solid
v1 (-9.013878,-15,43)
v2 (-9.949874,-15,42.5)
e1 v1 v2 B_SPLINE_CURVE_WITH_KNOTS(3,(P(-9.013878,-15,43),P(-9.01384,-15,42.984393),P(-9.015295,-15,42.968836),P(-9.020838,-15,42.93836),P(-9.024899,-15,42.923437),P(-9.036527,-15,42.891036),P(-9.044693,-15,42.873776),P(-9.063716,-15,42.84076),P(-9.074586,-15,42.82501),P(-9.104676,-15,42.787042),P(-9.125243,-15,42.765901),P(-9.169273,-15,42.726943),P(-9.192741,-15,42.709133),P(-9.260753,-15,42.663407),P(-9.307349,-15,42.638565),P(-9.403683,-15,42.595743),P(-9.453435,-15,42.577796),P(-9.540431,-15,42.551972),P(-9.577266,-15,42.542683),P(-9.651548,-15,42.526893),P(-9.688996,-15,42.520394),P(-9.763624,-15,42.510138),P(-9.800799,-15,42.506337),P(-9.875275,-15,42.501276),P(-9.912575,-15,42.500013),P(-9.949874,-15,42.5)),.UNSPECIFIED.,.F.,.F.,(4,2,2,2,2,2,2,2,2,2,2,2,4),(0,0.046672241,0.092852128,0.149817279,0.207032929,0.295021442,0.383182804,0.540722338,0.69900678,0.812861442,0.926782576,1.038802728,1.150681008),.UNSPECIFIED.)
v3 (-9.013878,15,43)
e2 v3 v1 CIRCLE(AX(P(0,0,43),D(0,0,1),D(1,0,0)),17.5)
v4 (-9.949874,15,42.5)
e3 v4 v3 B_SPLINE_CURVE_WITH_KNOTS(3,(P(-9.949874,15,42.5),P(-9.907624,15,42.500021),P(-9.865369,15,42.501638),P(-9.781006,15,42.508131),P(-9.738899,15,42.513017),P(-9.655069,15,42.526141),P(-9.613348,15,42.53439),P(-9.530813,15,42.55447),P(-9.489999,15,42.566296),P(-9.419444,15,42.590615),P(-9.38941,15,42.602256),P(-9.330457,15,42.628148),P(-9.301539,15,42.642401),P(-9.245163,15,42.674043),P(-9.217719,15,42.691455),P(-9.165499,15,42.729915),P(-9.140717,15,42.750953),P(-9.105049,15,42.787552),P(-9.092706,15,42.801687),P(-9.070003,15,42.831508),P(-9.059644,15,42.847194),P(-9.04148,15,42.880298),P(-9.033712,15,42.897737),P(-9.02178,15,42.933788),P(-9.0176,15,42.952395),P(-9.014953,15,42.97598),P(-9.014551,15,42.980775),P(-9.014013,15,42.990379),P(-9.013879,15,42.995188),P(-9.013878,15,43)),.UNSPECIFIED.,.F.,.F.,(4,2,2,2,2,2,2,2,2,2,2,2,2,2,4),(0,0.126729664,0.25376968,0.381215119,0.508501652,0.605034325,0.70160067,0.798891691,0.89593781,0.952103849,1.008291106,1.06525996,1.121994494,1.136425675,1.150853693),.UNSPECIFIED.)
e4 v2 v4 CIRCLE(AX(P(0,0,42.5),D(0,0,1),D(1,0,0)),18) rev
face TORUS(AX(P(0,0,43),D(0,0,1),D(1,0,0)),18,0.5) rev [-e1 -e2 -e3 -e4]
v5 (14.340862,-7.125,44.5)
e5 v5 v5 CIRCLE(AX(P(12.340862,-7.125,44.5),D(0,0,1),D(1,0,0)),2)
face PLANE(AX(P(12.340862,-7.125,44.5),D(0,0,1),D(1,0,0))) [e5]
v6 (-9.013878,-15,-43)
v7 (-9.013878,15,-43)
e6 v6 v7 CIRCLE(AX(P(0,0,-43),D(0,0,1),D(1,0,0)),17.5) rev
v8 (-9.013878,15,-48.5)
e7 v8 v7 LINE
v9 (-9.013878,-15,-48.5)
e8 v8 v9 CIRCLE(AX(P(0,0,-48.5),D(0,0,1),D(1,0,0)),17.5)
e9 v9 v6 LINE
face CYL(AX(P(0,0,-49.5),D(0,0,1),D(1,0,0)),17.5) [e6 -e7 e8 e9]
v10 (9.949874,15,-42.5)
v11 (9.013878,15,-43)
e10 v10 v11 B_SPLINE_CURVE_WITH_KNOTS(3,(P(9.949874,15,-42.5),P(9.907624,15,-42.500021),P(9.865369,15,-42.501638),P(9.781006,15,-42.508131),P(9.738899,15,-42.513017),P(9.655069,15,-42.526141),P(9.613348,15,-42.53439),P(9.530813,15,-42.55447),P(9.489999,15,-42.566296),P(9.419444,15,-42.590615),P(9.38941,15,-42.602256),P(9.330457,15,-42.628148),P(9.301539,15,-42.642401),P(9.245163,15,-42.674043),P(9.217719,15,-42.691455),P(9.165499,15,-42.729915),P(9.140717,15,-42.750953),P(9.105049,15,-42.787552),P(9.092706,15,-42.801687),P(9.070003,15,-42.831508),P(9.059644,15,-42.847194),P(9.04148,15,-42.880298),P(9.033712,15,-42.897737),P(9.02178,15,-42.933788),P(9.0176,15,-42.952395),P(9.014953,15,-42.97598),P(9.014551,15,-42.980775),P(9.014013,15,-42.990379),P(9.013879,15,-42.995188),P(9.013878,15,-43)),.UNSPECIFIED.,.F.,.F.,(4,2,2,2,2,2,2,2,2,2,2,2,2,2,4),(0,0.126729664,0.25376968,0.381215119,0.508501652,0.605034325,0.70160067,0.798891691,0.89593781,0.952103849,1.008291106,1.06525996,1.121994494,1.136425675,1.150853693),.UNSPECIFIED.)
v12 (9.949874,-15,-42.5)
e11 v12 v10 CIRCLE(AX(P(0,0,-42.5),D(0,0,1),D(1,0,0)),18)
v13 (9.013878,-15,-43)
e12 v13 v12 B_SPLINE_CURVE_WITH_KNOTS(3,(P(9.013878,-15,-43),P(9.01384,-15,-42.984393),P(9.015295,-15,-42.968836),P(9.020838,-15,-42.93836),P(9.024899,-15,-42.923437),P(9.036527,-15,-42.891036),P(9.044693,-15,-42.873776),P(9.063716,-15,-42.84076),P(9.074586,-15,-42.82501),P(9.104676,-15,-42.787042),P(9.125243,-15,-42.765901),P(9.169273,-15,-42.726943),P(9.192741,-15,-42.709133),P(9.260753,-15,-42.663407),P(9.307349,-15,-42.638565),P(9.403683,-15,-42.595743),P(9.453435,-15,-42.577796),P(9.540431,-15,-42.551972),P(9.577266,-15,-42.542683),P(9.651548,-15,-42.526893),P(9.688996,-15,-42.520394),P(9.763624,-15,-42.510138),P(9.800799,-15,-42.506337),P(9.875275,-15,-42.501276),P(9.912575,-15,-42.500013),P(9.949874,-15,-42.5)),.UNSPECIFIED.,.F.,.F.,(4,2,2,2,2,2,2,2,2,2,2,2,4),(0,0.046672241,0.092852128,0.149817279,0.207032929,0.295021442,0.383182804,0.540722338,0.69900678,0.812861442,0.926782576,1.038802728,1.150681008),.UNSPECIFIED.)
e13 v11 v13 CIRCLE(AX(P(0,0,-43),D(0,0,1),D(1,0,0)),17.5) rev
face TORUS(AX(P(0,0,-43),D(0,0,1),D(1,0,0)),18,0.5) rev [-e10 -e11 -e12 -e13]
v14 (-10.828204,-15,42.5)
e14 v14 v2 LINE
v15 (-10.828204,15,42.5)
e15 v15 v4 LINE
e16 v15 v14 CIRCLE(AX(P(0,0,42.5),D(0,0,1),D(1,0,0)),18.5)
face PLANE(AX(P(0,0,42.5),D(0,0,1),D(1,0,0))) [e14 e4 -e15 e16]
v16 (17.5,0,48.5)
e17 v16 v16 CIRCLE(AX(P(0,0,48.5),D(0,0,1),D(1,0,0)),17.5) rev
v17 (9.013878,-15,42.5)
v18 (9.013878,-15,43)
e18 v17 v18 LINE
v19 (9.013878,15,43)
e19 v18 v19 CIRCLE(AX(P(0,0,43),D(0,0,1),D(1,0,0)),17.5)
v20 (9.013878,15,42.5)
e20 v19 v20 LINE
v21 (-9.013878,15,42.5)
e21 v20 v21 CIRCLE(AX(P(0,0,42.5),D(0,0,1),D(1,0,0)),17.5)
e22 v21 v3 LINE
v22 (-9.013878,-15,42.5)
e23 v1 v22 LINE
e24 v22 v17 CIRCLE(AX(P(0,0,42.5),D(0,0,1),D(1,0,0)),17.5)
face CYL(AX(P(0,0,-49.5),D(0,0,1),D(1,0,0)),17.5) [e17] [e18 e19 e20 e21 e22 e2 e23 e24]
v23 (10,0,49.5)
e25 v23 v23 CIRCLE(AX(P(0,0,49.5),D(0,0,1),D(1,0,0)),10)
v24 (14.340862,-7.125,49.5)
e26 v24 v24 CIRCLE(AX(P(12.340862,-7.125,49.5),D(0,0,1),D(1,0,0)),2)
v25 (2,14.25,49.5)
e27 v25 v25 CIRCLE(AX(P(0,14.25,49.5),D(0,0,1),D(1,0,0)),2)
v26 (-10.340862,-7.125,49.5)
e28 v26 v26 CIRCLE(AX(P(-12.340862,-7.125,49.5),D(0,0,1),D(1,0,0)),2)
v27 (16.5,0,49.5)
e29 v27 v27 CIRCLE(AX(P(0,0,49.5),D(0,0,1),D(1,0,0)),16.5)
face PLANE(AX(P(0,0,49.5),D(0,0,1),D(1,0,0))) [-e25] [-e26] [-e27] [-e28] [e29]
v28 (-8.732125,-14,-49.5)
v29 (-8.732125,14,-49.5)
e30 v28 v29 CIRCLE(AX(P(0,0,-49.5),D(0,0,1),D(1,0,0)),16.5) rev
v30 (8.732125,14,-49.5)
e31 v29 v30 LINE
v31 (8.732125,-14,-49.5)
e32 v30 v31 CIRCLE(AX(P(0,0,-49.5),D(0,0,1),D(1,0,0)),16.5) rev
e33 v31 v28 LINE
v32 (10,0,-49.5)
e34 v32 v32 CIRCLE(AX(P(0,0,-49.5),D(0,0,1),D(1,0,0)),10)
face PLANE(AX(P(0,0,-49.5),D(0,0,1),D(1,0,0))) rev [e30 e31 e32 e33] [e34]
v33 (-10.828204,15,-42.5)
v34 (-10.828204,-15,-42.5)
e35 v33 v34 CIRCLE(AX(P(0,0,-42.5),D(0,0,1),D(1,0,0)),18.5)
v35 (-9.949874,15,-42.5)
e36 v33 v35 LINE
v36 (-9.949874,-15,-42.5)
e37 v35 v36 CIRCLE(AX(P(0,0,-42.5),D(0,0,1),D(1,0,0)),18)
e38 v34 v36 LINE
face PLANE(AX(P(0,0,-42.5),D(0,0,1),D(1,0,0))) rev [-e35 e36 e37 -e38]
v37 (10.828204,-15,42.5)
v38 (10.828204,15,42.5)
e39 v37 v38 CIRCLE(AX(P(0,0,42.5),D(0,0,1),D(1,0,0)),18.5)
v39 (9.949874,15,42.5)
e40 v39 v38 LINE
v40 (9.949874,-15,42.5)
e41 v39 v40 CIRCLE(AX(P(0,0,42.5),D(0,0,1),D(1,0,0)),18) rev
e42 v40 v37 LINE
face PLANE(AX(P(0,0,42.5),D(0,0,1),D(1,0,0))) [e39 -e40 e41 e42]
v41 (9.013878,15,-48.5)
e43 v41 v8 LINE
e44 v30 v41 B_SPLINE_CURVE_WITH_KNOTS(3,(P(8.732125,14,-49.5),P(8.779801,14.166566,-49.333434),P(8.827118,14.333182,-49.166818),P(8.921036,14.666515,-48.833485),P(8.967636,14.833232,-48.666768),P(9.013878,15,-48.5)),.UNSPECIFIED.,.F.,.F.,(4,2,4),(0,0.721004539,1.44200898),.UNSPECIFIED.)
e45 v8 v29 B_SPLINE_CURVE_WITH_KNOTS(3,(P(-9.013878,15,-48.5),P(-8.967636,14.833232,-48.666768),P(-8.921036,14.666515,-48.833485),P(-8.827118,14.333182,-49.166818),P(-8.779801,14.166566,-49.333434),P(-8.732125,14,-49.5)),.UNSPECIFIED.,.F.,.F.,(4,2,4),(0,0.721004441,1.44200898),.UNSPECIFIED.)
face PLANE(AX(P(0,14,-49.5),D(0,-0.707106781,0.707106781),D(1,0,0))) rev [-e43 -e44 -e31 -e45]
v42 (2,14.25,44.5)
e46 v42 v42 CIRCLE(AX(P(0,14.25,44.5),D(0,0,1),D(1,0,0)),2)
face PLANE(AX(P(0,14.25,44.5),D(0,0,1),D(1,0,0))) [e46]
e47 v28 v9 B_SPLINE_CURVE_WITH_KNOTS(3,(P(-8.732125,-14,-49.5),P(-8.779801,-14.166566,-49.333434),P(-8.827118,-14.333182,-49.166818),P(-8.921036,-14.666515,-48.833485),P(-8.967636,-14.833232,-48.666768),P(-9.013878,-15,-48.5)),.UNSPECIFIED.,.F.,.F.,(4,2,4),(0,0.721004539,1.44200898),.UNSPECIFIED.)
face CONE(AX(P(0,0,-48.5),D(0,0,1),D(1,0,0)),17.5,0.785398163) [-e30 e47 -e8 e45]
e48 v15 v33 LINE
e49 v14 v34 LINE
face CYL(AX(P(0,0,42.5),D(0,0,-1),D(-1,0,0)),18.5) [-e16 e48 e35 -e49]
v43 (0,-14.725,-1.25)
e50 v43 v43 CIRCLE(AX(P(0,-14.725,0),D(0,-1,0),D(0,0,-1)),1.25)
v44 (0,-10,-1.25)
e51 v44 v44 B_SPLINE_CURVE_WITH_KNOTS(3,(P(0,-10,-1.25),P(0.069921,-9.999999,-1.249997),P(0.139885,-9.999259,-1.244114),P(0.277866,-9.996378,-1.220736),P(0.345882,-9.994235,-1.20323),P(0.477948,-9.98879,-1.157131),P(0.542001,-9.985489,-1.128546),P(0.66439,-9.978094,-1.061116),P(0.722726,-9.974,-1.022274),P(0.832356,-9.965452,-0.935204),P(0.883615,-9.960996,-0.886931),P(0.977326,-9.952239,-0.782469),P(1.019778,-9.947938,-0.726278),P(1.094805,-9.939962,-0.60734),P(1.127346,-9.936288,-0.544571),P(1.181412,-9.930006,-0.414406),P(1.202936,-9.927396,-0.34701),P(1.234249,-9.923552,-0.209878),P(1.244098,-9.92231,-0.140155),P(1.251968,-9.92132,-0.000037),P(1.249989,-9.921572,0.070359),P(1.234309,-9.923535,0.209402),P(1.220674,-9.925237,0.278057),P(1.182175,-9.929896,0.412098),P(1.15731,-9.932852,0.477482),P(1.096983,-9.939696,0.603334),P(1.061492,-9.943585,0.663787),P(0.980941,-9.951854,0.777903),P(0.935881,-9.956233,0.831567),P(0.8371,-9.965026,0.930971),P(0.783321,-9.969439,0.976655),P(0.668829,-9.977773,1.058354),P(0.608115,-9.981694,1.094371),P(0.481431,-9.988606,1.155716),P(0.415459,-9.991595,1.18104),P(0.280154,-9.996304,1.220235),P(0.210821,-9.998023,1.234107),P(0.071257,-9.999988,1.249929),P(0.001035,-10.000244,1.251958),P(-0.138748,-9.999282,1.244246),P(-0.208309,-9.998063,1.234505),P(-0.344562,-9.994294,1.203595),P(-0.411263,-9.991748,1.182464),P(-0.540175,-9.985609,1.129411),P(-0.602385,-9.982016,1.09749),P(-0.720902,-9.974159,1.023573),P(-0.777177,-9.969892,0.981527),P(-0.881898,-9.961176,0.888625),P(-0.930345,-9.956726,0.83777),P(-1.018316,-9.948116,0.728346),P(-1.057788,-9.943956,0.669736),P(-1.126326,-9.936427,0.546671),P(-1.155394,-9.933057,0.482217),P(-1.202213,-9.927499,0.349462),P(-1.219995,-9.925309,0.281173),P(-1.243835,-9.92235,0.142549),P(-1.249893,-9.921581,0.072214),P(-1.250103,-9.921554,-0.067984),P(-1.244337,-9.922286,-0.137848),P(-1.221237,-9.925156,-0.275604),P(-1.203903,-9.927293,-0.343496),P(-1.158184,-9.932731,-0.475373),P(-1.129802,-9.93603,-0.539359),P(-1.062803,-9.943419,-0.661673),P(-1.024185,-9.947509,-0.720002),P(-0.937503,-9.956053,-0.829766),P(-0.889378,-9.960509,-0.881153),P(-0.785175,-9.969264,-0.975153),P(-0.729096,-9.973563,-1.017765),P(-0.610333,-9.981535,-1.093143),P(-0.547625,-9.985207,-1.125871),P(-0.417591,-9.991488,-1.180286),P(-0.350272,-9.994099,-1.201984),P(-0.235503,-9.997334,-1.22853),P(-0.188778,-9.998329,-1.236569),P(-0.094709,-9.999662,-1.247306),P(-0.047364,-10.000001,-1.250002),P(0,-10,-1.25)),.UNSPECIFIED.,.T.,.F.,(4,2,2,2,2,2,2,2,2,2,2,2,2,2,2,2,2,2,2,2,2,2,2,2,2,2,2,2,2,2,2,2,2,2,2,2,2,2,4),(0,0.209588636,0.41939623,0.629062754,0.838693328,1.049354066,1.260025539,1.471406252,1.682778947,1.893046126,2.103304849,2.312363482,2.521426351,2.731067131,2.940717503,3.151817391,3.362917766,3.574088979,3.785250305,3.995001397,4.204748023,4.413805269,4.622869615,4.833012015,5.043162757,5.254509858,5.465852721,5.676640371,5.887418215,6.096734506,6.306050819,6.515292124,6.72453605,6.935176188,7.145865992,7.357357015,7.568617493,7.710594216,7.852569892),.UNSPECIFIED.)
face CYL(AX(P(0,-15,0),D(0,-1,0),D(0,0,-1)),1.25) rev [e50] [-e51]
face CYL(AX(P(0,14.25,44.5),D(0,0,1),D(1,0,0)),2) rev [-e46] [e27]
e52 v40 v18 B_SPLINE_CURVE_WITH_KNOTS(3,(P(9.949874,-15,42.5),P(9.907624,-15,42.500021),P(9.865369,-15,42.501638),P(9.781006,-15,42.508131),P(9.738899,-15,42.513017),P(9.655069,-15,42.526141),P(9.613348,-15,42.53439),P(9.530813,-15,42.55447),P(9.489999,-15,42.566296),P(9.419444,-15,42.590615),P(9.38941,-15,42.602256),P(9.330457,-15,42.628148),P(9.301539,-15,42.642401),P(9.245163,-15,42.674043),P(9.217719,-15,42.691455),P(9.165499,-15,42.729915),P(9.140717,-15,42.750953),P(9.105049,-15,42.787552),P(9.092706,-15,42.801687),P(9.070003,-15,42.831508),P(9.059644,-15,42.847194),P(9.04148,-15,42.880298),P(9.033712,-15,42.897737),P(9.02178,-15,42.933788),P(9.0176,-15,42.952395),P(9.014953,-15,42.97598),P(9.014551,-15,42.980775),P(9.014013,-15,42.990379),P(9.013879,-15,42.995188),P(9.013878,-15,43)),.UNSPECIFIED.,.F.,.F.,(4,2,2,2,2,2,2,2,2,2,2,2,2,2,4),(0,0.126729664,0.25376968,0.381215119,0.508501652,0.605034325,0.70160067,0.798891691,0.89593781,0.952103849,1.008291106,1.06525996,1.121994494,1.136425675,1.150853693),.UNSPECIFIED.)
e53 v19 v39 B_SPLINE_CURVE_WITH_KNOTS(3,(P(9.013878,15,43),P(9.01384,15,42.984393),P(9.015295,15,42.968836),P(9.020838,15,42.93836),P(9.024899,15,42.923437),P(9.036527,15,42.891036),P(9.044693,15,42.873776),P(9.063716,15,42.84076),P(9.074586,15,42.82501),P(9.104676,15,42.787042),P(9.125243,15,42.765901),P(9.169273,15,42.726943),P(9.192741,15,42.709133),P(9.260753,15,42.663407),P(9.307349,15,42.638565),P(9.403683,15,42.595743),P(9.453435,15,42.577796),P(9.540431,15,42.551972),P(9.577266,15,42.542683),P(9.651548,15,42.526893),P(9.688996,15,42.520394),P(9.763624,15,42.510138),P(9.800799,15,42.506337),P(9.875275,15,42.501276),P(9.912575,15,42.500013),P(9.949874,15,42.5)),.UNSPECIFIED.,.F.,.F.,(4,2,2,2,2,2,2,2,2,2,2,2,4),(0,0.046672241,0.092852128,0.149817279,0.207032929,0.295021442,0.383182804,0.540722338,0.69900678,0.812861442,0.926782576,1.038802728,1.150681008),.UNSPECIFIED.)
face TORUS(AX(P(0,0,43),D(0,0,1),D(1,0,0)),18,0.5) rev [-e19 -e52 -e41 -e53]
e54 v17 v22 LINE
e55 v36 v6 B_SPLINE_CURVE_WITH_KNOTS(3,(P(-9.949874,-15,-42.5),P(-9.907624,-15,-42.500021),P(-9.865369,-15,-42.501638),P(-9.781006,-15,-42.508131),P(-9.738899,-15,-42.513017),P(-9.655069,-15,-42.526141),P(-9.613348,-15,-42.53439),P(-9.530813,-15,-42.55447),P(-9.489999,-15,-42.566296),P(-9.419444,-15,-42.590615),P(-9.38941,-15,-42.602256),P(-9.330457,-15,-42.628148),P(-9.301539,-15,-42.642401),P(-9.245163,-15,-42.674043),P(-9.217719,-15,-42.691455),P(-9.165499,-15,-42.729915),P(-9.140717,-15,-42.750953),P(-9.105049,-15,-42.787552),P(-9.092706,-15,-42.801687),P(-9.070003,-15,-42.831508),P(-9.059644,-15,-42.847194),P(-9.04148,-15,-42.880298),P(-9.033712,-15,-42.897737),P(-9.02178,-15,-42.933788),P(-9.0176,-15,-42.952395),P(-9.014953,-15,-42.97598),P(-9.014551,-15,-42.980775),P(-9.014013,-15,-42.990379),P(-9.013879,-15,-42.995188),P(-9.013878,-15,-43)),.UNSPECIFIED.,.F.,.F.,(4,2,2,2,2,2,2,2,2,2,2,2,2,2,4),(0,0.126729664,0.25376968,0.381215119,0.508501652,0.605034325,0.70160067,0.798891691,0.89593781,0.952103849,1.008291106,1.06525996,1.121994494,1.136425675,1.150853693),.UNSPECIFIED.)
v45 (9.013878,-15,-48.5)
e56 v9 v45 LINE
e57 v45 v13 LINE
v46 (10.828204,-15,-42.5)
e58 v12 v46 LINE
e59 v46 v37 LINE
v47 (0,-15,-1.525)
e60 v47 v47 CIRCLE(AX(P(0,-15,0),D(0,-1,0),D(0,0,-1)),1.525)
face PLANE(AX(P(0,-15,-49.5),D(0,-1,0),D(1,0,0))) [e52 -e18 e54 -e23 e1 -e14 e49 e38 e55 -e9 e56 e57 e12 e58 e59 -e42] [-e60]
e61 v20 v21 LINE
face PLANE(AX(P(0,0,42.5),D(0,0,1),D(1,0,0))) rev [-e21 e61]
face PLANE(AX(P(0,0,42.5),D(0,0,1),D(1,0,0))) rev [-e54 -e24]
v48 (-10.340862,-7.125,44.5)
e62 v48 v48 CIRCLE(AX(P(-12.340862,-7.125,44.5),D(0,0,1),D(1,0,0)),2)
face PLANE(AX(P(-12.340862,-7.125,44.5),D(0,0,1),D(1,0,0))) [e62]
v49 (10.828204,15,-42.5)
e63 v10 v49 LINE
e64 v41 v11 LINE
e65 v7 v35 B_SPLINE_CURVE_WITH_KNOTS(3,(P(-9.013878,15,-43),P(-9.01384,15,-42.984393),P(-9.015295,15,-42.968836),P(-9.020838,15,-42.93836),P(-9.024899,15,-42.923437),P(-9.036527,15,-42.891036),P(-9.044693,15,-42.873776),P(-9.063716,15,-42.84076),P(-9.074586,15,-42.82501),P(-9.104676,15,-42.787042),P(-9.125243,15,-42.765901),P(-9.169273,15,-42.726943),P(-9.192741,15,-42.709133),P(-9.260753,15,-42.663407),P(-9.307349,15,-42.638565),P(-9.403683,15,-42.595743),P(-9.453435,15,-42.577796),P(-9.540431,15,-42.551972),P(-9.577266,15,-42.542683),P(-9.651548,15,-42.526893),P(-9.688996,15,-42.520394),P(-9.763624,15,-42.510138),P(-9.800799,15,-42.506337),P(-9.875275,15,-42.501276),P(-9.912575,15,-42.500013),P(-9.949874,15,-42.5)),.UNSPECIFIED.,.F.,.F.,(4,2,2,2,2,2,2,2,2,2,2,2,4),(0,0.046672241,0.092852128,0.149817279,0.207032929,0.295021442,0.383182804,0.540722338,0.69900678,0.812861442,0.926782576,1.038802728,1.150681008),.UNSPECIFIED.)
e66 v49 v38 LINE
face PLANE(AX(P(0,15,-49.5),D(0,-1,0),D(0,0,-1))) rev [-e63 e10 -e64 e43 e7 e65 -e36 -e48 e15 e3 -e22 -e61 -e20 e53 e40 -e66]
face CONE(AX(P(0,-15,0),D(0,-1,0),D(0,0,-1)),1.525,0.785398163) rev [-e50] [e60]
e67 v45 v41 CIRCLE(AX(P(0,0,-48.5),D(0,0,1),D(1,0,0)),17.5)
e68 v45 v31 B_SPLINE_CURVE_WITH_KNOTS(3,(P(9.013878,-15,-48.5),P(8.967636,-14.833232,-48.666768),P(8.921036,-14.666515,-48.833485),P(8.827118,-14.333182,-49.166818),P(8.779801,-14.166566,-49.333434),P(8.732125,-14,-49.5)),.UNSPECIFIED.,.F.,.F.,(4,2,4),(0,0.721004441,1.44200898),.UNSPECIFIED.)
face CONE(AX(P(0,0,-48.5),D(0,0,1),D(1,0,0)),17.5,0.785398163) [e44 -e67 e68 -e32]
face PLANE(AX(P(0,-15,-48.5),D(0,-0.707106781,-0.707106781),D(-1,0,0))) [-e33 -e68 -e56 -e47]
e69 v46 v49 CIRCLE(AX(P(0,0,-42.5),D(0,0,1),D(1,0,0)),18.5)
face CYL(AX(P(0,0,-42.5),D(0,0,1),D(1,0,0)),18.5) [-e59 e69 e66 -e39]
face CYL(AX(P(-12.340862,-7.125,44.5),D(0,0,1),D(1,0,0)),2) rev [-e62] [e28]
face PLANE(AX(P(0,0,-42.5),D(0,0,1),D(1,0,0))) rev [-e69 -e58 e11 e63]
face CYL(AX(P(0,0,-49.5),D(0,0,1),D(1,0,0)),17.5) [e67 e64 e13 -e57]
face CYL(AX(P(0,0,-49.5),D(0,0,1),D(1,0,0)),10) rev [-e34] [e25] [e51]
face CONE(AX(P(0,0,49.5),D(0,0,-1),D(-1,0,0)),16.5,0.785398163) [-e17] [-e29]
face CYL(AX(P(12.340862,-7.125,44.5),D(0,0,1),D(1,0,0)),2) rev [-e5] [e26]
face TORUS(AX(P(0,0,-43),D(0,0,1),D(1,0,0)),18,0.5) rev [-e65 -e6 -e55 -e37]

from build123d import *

# Parameters (mm, degrees)
BOSS_EXTRUDE1_DEPTH         = 49.5
BOSS_EXTRUDE1_DEPTH_BACK    = 49.5
BOSS_EXTRUDE2_DEPTH         = 42.5
BOSS_EXTRUDE2_DEPTH_BACK    = 42.5
BOSS_EXTRUDE3_START         = -7
BOSS_EXTRUDE3_DEPTH         = 7
SKETCH6_R                   = 2
SKETCH6_R_2                 = 2.0000000000012577
SKETCH6_R_3                 = 2.0000000000018354
CUT_EXTRUDE1_DEPTH          = 5
M3_TAPPED_HOLE1_D           = 2.5
M3_TAPPED_HOLE1_DEPTH       = 7.5
M3_TAPPED_HOLE1_CSINK_D     = 3.05
M3_TAPPED_HOLE1_CSINK_ANGLE = 90
M3_TAPPED_HOLE1_TIP         = 0.7510757737844503
FILLET1_R                   = 0.5
CHAMFER1_SIZE               = 1
CHAMFER2_SIZE               = 1


with BuildPart() as part:
    # Sketch1 → Boss-Extrude1 (new, two sides: drawn at the far end of the back side and taken through both)
    with BuildSketch(Plane.XY.offset(-BOSS_EXTRUDE1_DEPTH_BACK)):
        with BuildLine():
            Line((9.013878188660517, 15), (0, 15))
            Line((0, 15), (0, 10.000000000000004))
            ThreePointArc((-4.824e-14, 10.000000000000004), (7.07106781186546, 7.071067811865495), (10.000000000000004, 0))
            ThreePointArc((10.000000000000004, -2.45e-15), (7.071067811865457, -7.071067811865499), (-5.513e-14, -10.000000000000004))
            Line((0, -10.000000000000007), (0, -15))
            Line((0, -14.999999999999998), (9.013878188660513, -14.999999999999996))
            ThreePointArc((9.013878188660447, -14.999999999999721), (15.231429156542696, -8.617050878880846), (17.500000000000004, -4.29e-15))
            ThreePointArc((17.500000000000004, 0), (15.231429156542696, 8.617050878880846), (9.013878188660442, 14.999999999999723))
        make_face()
        with BuildLine():
            Line((0, 10.000000000000004), (0, 15))
            Line((0, 15), (-9.013878188659975, 15))
            ThreePointArc((-9.013878188659975, 15.000000000000002), (-17.500000000000004, 1.769e-14), (-9.01387818866, -14.99999999999999))
            Line((-9.013878188659985, -15), (0, -14.999999999999998))
            Line((0, -15), (0, -10.000000000000007))
            ThreePointArc((-5.513e-14, -10.000000000000004), (-10.000000000000004, 1.22e-15), (-4.824e-14, 10.000000000000004))
        make_face()
    extrude(amount=BOSS_EXTRUDE1_DEPTH + BOSS_EXTRUDE1_DEPTH_BACK)

    # Sketch1<23> → Boss-Extrude2 (add, two sides: drawn at the far end of the back side and taken through both)
    with BuildSketch(Plane.XY.offset(-BOSS_EXTRUDE2_DEPTH_BACK)):
        with BuildLine():
            Line((-9.013878188659975, 15), (-10.828203913853855, 15))
            ThreePointArc((-10.828203913853855, 15.000000000000004), (-18.5, -5.95e-15), (-10.828203913853852, -15.000000000000005))
            Line((-10.828203913853855, -15), (-9.013878188659985, -15))
            ThreePointArc((-9.01387818866, -14.99999999999999), (-17.500000000000004, 1.769e-14), (-9.013878188659975, 15.000000000000002))
        make_face()
        with BuildLine():
            ThreePointArc((18.5, 0), (16.470758519362374, 8.424020049646833), (10.828203913853855, 15))
            Line((10.828203913853855, 15), (9.013878188660517, 15))
            ThreePointArc((9.013878188660442, 14.999999999999723), (15.231429156542696, 8.617050878880846), (17.500000000000004, 0))
            ThreePointArc((17.500000000000004, -4.29e-15), (15.231429156542696, -8.617050878880846), (9.013878188660447, -14.999999999999721))
            Line((9.013878188660513, -14.999999999999996), (10.828203913853855, -14.999999999999996))
            ThreePointArc((10.828203913853848, -15.000000000000009), (16.47075851936237, -8.42402004964684), (18.5, -4.53e-15))
        make_face()
    extrude(amount=BOSS_EXTRUDE2_DEPTH + BOSS_EXTRUDE2_DEPTH_BACK)

    # Sketch5 → Boss-Extrude3 (add)
    with BuildSketch(Plane.XY.offset(49.5).offset(BOSS_EXTRUDE3_START)):
        with BuildLine():
            ThreePointArc((9.013878188660444, 14.999999999999721), (2.7267e-13, 17.500000000000004), (-9.013878188659977, 15.000000000000002))
            Line((-9.013878188659975, 15), (9.013878188660518, 14.99999999999984))
        make_face()
        with BuildLine():
            ThreePointArc((-9.013878188659985, -14.999999999999998), (2.6645e-13, -17.500000000000007), (9.01387818866044, -14.999999999999726))
            Line((9.013878188660513, -14.999999999999838), (-9.013878188659987, -14.999999999999998))
        make_face()
    extrude(amount=BOSS_EXTRUDE3_DEPTH)

    # Sketch6 → Cut-Extrude1 (cut)
    with BuildSketch(Plane.XY.offset(49.5)):
        with Locations((0, 14.25)):
            Circle(SKETCH6_R)
        with Locations((12.340862003929768, -7.124999999999125)):
            Circle(SKETCH6_R_2)
        with Locations((-12.340862003926736, -7.12500000000088)):
            Circle(SKETCH6_R_3)
    extrude(amount=-CUT_EXTRUDE1_DEPTH, mode=Mode.SUBTRACT)

    # M3 Tapped Hole1
    with Locations(Plane(origin=(2.4e-15, -14.999999999999998, 0), x_dir=(-1, -1.6e-16, 0), z_dir=(1.6e-16, -1, 0))):
        with Locations((0, 0)):
            CounterSinkHole(M3_TAPPED_HOLE1_D / 2, M3_TAPPED_HOLE1_CSINK_D / 2, depth=M3_TAPPED_HOLE1_DEPTH, counter_sink_angle=M3_TAPPED_HOLE1_CSINK_ANGLE)
            with Locations((0, 0, -(M3_TAPPED_HOLE1_DEPTH + M3_TAPPED_HOLE1_TIP / 2))):  # 118° drill point
                Cone(0, M3_TAPPED_HOLE1_D / 2, M3_TAPPED_HOLE1_TIP, mode=Mode.SUBTRACT)

    # Fillet1
    # the kernel refuses this fillet: 0.5 mm, written as the material it adds along each edge
    with BuildSketch(Plane(origin=(-1.421e-14, 5.77e-15, 42.5), x_dir=(0.45254890557349203, -0.8917395853410538, 0), z_dir=(-0.8917395853410538, -0.45254890557349203, 0))) as fillet1_piece_1_section:
        with BuildLine():
            CenterArc((17.500000000000018 + FILLET1_R, FILLET1_R), FILLET1_R, 180, 90)
            Line((17.500000000000018 + FILLET1_R, 0), (17.500000000000018, 0))
            Line((17.500000000000018, 0), (17.500000000000018, FILLET1_R))
        make_face()
    fillet1_piece_1 = revolve(axis=Axis((-1.421e-14, 5.77e-15, 42.5), (0, 0, 1)), revolution_arc=126.18532587010755, mode=Mode.PRIVATE)
    fillet1_piece_1 = split(fillet1_piece_1, bisect_by=Plane(origin=(17.637648609148254, 15, 42.63764860914824), z_dir=(0, -1, 0)), keep=Keep.TOP, mode=Mode.PRIVATE)
    fillet1_piece_1 = split(fillet1_piece_1, bisect_by=Plane(origin=(17.637648609148258, -14.999999999999995, 42.63764860914824), z_dir=(-2e-16, 1, 0)), keep=Keep.TOP, mode=Mode.PRIVATE)
    add(fillet1_piece_1)
    with BuildSketch(Plane(origin=(-1.066e-14, -6.22e-15, -42.5), x_dir=(0.4525489055734917, 0.891739585341054, 0), z_dir=(-0.891739585341054, 0.4525489055734917, 0))) as fillet1_piece_2_section:
        with BuildLine():
            CenterArc((17.50000000000003 + FILLET1_R, FILLET1_R), FILLET1_R, 180, 90)
            Line((17.50000000000003 + FILLET1_R, 0), (17.50000000000003, 0))
            Line((17.50000000000003, 0), (17.50000000000003, FILLET1_R))
        make_face()
    fillet1_piece_2 = revolve(axis=Axis((-1.066e-14, -6.22e-15, -42.5), (0, 0, -1)), revolution_arc=126.18532587010758, mode=Mode.PRIVATE)
    fillet1_piece_2 = split(fillet1_piece_2, bisect_by=Plane(origin=(17.63764860914827, 15, -42.63764860914825), z_dir=(0, -1, 0)), keep=Keep.TOP, mode=Mode.PRIVATE)
    fillet1_piece_2 = split(fillet1_piece_2, bisect_by=Plane(origin=(17.637648609148272, -14.999999999999995, -42.63764860914825), z_dir=(-2e-16, 1, 0)), keep=Keep.TOP, mode=Mode.PRIVATE)
    add(fillet1_piece_2)
    with BuildSketch(Plane(origin=(1.78e-15, -1.33e-15, 42.5), x_dir=(-0.4525489055734672, -0.8917395853410666, 0), z_dir=(0.8917395853410666, -0.4525489055734672, 0))) as fillet1_piece_3_section:
        with BuildLine():
            CenterArc((17.50000000000002 + FILLET1_R, -FILLET1_R), FILLET1_R, 90, 90)
            Line((17.50000000000002 + FILLET1_R, 0), (17.50000000000002, 0))
            Line((17.50000000000002, 0), (17.50000000000002, -FILLET1_R))
        make_face()
    fillet1_piece_3 = revolve(axis=Axis((1.78e-15, -1.33e-15, 42.5), (0, 0, -1)), revolution_arc=126.18532587011086, mode=Mode.PRIVATE)
    fillet1_piece_3 = split(fillet1_piece_3, bisect_by=Plane(origin=(-17.637648609148275, 15, 42.63764860914824), z_dir=(0, -1, 0)), keep=Keep.TOP, mode=Mode.PRIVATE)
    fillet1_piece_3 = split(fillet1_piece_3, bisect_by=Plane(origin=(-17.637648609148272, -15.000000000000002, 42.63764860914824), z_dir=(-2e-16, 1, 0)), keep=Keep.TOP, mode=Mode.PRIVATE)
    add(fillet1_piece_3)
    with BuildSketch(Plane(origin=(1.78e-15, -1.33e-15, -42.5), x_dir=(-0.4525489055734672, -0.8917395853410666, 0), z_dir=(0.8917395853410666, -0.4525489055734672, 0))) as fillet1_piece_4_section:
        with BuildLine():
            CenterArc((17.500000000000007 + FILLET1_R, FILLET1_R), FILLET1_R, 180, 90)
            Line((17.50000000000001, FILLET1_R), (17.500000000000007, 0))
            Line((17.500000000000007, 0), (17.500000000000007 + FILLET1_R, 0))
        make_face()
    fillet1_piece_4 = revolve(axis=Axis((1.78e-15, -1.33e-15, -42.5), (0, 0, -1)), revolution_arc=126.18532587011086, mode=Mode.PRIVATE)
    fillet1_piece_4 = split(fillet1_piece_4, bisect_by=Plane(origin=(-17.637648609147508, 15, -42.6376486091475), z_dir=(0, -1, 0)), keep=Keep.TOP, mode=Mode.PRIVATE)
    fillet1_piece_4 = split(fillet1_piece_4, bisect_by=Plane(origin=(-17.637648609147504, -15.000000000000002, -42.6376486091475), z_dir=(-2e-16, 1, 0)), keep=Keep.TOP, mode=Mode.PRIVATE)
    add(fillet1_piece_4)

    # Chamfer1
    chamfer1_edges = [part.edges().sort_by_distance(p)[0] for p in [
        (9.01387818866, 14.99999999999999, 49.5),
        (-17.500000000000007, 1.066e-14, -49.5),
        (17.500000000000004, 5.77e-15, -49.5),
    ]]
    chamfer(chamfer1_edges, length=CHAMFER1_SIZE)

    # Chamfer2
    chamfer2_edges = [part.edges().sort_by_distance(p)[0] for p in [
        (1.78e-15, -14.999999999999927, -49.5),
        (1.421e-14, 14.999999999999932, -49.5),
    ]]
    chamfer(chamfer2_edges, length=CHAMFER2_SIZE)


solid = part.part
